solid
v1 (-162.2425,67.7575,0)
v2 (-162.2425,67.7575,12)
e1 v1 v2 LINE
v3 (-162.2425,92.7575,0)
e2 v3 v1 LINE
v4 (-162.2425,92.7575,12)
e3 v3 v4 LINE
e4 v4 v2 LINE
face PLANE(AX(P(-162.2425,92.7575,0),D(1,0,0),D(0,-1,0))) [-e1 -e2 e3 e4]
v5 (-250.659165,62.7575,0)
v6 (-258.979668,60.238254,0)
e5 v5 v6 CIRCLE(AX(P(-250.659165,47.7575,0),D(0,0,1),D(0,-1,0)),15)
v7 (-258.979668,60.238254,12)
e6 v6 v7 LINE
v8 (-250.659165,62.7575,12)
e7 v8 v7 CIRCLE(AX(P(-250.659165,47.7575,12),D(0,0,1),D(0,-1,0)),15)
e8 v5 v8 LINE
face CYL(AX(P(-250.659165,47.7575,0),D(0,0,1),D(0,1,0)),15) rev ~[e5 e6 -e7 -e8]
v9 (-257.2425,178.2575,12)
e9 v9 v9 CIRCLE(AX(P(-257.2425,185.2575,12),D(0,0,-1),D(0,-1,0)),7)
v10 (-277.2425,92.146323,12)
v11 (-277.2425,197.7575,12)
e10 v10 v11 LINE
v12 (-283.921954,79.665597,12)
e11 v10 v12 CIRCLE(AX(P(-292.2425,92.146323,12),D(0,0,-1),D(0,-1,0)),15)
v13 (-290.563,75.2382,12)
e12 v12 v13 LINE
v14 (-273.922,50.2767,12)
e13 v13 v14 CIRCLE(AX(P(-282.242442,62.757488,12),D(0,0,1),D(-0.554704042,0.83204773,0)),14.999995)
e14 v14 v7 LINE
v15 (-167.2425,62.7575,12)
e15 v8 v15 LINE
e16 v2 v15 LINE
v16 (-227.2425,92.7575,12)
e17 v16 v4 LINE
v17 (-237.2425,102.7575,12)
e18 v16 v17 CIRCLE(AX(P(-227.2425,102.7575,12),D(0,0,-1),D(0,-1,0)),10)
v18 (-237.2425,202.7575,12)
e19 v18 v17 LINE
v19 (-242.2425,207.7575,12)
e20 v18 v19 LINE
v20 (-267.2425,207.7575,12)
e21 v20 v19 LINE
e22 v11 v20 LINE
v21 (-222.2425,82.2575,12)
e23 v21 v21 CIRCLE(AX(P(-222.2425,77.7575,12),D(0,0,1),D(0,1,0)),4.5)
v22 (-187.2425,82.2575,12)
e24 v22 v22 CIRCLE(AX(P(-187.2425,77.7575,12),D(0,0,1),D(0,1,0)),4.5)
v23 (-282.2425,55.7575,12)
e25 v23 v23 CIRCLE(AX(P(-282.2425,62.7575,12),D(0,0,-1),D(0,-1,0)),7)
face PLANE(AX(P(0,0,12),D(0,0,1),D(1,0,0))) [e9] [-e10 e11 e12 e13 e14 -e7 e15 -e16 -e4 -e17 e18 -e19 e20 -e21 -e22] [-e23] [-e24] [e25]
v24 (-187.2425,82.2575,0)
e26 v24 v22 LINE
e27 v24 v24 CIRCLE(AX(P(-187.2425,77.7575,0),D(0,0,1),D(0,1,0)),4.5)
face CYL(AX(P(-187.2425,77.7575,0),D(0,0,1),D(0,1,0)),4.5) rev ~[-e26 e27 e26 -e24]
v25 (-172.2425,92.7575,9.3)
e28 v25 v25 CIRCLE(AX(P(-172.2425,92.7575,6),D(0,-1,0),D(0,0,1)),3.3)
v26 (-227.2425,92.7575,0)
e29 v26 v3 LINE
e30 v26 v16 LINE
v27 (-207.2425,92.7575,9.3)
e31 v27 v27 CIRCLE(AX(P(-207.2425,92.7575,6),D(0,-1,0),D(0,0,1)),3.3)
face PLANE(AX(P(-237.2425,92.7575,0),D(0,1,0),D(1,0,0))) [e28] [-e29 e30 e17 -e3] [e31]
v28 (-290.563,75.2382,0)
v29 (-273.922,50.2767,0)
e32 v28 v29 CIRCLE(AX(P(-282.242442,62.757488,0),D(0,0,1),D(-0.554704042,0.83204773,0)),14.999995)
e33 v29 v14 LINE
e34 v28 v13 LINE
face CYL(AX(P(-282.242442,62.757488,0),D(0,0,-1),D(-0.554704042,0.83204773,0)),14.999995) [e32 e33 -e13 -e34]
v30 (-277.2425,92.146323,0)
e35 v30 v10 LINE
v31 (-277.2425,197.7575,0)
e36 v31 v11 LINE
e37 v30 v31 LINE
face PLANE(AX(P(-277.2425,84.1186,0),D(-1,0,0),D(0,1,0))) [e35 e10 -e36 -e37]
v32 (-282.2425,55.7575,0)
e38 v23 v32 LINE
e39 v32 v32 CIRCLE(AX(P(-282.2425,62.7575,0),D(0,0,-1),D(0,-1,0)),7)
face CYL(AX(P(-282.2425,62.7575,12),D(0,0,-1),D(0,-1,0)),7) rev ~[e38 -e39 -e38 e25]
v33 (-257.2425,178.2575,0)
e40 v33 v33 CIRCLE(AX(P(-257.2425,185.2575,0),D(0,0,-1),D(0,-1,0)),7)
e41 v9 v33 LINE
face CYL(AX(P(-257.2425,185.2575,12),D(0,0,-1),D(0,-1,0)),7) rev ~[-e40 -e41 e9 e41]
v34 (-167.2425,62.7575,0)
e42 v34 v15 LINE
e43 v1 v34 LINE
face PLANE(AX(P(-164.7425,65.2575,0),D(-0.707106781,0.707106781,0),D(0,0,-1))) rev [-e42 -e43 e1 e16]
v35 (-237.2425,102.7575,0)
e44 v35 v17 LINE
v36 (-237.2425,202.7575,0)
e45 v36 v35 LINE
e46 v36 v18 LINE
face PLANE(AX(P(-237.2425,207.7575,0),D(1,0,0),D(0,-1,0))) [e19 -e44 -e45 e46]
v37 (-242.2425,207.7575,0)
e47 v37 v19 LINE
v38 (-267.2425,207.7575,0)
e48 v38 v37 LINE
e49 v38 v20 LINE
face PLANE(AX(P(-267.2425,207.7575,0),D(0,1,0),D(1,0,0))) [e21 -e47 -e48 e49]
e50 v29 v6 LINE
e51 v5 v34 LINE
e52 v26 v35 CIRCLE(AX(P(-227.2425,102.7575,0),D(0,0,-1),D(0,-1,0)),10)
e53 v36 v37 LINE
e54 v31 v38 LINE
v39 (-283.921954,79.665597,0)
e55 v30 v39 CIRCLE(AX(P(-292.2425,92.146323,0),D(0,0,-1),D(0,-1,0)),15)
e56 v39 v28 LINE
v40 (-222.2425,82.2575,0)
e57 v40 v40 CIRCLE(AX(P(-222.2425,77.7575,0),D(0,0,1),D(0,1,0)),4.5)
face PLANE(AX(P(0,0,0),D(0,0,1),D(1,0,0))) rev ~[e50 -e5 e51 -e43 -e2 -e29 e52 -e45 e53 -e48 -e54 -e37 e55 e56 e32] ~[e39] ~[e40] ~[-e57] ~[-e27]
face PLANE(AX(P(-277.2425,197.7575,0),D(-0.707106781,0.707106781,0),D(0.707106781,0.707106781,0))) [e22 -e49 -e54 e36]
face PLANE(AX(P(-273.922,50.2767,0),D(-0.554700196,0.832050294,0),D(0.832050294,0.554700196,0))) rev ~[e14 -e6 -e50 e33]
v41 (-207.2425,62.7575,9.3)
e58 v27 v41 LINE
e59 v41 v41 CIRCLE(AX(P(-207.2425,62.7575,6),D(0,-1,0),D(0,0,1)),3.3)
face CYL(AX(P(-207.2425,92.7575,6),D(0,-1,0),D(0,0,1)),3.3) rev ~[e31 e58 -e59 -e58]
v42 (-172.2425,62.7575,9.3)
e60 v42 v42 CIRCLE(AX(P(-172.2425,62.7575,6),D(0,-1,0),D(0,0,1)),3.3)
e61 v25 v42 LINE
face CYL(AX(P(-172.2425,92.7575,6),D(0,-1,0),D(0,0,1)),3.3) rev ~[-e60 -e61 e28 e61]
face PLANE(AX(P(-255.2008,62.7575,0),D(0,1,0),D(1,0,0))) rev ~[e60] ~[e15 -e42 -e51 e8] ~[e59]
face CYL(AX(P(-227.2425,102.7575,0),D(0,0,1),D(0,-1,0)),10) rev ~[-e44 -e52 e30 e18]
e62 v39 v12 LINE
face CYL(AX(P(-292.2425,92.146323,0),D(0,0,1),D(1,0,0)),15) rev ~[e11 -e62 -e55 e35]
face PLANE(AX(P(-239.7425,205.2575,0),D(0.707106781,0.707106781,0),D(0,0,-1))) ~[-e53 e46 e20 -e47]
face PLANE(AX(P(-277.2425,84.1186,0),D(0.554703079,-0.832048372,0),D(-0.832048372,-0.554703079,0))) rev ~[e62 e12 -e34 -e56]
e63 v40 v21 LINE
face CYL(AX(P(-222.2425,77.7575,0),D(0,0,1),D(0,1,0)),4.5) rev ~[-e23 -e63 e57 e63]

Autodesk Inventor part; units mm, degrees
ref_plane "YZ Plane" through (0, 0, 0) normal (1, 0, 0) x (0, 1, 0)
ref_plane "XZ Plane" through (0, 0, 0) normal (0, 1, 0) x (-1, 0, 0)
sketch "スケッチ2" plane through (0, 0, 0) normal (0, 0, 1) x (1, 0, 0)
  line L0 (-162.2425, 92.7575) -> (-162.2425, 62.7575)
  line L1 (-267.2425, 207.7575) -> (-237.2425, 207.7575)
  arc A0 (-290.563, 75.2382) -> (-273.922, 50.2767) centre (-282.2425, 62.7575) ccw
  line L2 (-277.2425, 84.1186) -> (-290.563, 75.2382)
  line L3 (-277.2425, 84.1186) -> (-277.2425, 197.7575)
  line L4 (-277.2425, 197.7575) -> (-267.2425, 207.7575)
  line L5 (-237.2425, 207.7575) -> (-237.2425, 92.7575)
  line L6 (-237.2425, 92.7575) -> (-162.2425, 92.7575)
  line L7 (-273.922, 50.2767) -> (-255.2008, 62.7575)
  line L8 (-255.2008, 62.7575) -> (-162.2425, 62.7575)
  line L9 (-282.2425, 62.7575) -> (-237.2425, 92.7575) construction
  point P0 (0, 0)
  point P1 (-277.2425, 207.7575)
  dimension "d18" = 120
  dimension "d21" = 15
  dimension "d22" = 10
  dimension "d23" = 10
  dimension "d116" = 5
  dimension "d154" = 15
  dimension "d155" = 145
  dimension "d175" = 30
  dimension "d181" = 90
  dimension "d182" = 40
extrude "押し出し2" add sketch "スケッチ2" along normal blind 12
sketch "スケッチ3" plane through (0, 0, 12) normal (0, 0, 1) x (1, 0, 0)
  arc A0 (-290.563, 75.2382) -> (-282.2425, 47.7575) centre (-282.2425, 62.7575) ccw projected
  line L0 (-267.2425, 207.7575) -> (-237.2425, 207.7575) projected
  point P0 (-257.2425, 185.2575)
  dimension "d16" = 25
  dimension "d153" = 22.5
hole "穴1" at (-257.2425, 185.2575, 12) at (-282.2425, 62.7575, 12) direction (0, 0, -1) diameter 14 end through all
sketch "スケッチ10" plane through (-237.2425, 92.7575, 0) normal (0, 1, 0) x (1, 0, 0)
  line L0 (75, 0) -> (75, -12)
  line L1 (0, -12) -> (75, -12)
  line L2 (75, 0) -> (0, 0) projected
  point P0 (65, -6)
  point P1 (30, -6)
  dimension "d119" = 35
  dimension "d156" = 10
  dimension "d157" = 6
hole "穴8" at (-172.2425, 92.7575, 6) at (-207.2425, 92.7575, 6) direction (0, -1, 0) diameter 6.6 end through all
chamfer "面取り1" distance 5 angle 45 1 edges at (-162.2425, 62.7575, 6)
fillet "フィレット1" radius 10 1 edges at (-237.2425, 92.7575, 6)
chamfer "面取り2" distance 5 angle 45 1 edges at (-237.2425, 207.7575, 6)
ref_plane "Work Plane2" through (-255.2008, 77.7575, 0) normal (0, -1, 0) x (1, 0, 0)
sketch "Sketch18" plane through (0, 0, 0) normal (0, 0, -1) x (-1, 0, 0)
  line L0 (162.2425, 67.7575) -> (162.2425, 92.7575) projected
  line L1 (324.2425, 77.7575) -> (135.2425, 77.7575) construction
  point P0 (187.2425, 77.7575)
  dimension "d165" = 25
hole "Hole13" at (-187.2425, 77.7575, 0) direction (0, 0, 1) diameter 9 end through all
pattern_linear "Rectangular Pattern1" count 2 spacing 35 along (-1, 0, 0) of "Hole13"
fillet "Fillet2" radius 15 2 edges at (-255.2008, 62.7575, 6) (-277.2425, 84.1186, 6)
equation "\"d23\" = d22"
properties part number "100007" material "STEEL - MILD"
